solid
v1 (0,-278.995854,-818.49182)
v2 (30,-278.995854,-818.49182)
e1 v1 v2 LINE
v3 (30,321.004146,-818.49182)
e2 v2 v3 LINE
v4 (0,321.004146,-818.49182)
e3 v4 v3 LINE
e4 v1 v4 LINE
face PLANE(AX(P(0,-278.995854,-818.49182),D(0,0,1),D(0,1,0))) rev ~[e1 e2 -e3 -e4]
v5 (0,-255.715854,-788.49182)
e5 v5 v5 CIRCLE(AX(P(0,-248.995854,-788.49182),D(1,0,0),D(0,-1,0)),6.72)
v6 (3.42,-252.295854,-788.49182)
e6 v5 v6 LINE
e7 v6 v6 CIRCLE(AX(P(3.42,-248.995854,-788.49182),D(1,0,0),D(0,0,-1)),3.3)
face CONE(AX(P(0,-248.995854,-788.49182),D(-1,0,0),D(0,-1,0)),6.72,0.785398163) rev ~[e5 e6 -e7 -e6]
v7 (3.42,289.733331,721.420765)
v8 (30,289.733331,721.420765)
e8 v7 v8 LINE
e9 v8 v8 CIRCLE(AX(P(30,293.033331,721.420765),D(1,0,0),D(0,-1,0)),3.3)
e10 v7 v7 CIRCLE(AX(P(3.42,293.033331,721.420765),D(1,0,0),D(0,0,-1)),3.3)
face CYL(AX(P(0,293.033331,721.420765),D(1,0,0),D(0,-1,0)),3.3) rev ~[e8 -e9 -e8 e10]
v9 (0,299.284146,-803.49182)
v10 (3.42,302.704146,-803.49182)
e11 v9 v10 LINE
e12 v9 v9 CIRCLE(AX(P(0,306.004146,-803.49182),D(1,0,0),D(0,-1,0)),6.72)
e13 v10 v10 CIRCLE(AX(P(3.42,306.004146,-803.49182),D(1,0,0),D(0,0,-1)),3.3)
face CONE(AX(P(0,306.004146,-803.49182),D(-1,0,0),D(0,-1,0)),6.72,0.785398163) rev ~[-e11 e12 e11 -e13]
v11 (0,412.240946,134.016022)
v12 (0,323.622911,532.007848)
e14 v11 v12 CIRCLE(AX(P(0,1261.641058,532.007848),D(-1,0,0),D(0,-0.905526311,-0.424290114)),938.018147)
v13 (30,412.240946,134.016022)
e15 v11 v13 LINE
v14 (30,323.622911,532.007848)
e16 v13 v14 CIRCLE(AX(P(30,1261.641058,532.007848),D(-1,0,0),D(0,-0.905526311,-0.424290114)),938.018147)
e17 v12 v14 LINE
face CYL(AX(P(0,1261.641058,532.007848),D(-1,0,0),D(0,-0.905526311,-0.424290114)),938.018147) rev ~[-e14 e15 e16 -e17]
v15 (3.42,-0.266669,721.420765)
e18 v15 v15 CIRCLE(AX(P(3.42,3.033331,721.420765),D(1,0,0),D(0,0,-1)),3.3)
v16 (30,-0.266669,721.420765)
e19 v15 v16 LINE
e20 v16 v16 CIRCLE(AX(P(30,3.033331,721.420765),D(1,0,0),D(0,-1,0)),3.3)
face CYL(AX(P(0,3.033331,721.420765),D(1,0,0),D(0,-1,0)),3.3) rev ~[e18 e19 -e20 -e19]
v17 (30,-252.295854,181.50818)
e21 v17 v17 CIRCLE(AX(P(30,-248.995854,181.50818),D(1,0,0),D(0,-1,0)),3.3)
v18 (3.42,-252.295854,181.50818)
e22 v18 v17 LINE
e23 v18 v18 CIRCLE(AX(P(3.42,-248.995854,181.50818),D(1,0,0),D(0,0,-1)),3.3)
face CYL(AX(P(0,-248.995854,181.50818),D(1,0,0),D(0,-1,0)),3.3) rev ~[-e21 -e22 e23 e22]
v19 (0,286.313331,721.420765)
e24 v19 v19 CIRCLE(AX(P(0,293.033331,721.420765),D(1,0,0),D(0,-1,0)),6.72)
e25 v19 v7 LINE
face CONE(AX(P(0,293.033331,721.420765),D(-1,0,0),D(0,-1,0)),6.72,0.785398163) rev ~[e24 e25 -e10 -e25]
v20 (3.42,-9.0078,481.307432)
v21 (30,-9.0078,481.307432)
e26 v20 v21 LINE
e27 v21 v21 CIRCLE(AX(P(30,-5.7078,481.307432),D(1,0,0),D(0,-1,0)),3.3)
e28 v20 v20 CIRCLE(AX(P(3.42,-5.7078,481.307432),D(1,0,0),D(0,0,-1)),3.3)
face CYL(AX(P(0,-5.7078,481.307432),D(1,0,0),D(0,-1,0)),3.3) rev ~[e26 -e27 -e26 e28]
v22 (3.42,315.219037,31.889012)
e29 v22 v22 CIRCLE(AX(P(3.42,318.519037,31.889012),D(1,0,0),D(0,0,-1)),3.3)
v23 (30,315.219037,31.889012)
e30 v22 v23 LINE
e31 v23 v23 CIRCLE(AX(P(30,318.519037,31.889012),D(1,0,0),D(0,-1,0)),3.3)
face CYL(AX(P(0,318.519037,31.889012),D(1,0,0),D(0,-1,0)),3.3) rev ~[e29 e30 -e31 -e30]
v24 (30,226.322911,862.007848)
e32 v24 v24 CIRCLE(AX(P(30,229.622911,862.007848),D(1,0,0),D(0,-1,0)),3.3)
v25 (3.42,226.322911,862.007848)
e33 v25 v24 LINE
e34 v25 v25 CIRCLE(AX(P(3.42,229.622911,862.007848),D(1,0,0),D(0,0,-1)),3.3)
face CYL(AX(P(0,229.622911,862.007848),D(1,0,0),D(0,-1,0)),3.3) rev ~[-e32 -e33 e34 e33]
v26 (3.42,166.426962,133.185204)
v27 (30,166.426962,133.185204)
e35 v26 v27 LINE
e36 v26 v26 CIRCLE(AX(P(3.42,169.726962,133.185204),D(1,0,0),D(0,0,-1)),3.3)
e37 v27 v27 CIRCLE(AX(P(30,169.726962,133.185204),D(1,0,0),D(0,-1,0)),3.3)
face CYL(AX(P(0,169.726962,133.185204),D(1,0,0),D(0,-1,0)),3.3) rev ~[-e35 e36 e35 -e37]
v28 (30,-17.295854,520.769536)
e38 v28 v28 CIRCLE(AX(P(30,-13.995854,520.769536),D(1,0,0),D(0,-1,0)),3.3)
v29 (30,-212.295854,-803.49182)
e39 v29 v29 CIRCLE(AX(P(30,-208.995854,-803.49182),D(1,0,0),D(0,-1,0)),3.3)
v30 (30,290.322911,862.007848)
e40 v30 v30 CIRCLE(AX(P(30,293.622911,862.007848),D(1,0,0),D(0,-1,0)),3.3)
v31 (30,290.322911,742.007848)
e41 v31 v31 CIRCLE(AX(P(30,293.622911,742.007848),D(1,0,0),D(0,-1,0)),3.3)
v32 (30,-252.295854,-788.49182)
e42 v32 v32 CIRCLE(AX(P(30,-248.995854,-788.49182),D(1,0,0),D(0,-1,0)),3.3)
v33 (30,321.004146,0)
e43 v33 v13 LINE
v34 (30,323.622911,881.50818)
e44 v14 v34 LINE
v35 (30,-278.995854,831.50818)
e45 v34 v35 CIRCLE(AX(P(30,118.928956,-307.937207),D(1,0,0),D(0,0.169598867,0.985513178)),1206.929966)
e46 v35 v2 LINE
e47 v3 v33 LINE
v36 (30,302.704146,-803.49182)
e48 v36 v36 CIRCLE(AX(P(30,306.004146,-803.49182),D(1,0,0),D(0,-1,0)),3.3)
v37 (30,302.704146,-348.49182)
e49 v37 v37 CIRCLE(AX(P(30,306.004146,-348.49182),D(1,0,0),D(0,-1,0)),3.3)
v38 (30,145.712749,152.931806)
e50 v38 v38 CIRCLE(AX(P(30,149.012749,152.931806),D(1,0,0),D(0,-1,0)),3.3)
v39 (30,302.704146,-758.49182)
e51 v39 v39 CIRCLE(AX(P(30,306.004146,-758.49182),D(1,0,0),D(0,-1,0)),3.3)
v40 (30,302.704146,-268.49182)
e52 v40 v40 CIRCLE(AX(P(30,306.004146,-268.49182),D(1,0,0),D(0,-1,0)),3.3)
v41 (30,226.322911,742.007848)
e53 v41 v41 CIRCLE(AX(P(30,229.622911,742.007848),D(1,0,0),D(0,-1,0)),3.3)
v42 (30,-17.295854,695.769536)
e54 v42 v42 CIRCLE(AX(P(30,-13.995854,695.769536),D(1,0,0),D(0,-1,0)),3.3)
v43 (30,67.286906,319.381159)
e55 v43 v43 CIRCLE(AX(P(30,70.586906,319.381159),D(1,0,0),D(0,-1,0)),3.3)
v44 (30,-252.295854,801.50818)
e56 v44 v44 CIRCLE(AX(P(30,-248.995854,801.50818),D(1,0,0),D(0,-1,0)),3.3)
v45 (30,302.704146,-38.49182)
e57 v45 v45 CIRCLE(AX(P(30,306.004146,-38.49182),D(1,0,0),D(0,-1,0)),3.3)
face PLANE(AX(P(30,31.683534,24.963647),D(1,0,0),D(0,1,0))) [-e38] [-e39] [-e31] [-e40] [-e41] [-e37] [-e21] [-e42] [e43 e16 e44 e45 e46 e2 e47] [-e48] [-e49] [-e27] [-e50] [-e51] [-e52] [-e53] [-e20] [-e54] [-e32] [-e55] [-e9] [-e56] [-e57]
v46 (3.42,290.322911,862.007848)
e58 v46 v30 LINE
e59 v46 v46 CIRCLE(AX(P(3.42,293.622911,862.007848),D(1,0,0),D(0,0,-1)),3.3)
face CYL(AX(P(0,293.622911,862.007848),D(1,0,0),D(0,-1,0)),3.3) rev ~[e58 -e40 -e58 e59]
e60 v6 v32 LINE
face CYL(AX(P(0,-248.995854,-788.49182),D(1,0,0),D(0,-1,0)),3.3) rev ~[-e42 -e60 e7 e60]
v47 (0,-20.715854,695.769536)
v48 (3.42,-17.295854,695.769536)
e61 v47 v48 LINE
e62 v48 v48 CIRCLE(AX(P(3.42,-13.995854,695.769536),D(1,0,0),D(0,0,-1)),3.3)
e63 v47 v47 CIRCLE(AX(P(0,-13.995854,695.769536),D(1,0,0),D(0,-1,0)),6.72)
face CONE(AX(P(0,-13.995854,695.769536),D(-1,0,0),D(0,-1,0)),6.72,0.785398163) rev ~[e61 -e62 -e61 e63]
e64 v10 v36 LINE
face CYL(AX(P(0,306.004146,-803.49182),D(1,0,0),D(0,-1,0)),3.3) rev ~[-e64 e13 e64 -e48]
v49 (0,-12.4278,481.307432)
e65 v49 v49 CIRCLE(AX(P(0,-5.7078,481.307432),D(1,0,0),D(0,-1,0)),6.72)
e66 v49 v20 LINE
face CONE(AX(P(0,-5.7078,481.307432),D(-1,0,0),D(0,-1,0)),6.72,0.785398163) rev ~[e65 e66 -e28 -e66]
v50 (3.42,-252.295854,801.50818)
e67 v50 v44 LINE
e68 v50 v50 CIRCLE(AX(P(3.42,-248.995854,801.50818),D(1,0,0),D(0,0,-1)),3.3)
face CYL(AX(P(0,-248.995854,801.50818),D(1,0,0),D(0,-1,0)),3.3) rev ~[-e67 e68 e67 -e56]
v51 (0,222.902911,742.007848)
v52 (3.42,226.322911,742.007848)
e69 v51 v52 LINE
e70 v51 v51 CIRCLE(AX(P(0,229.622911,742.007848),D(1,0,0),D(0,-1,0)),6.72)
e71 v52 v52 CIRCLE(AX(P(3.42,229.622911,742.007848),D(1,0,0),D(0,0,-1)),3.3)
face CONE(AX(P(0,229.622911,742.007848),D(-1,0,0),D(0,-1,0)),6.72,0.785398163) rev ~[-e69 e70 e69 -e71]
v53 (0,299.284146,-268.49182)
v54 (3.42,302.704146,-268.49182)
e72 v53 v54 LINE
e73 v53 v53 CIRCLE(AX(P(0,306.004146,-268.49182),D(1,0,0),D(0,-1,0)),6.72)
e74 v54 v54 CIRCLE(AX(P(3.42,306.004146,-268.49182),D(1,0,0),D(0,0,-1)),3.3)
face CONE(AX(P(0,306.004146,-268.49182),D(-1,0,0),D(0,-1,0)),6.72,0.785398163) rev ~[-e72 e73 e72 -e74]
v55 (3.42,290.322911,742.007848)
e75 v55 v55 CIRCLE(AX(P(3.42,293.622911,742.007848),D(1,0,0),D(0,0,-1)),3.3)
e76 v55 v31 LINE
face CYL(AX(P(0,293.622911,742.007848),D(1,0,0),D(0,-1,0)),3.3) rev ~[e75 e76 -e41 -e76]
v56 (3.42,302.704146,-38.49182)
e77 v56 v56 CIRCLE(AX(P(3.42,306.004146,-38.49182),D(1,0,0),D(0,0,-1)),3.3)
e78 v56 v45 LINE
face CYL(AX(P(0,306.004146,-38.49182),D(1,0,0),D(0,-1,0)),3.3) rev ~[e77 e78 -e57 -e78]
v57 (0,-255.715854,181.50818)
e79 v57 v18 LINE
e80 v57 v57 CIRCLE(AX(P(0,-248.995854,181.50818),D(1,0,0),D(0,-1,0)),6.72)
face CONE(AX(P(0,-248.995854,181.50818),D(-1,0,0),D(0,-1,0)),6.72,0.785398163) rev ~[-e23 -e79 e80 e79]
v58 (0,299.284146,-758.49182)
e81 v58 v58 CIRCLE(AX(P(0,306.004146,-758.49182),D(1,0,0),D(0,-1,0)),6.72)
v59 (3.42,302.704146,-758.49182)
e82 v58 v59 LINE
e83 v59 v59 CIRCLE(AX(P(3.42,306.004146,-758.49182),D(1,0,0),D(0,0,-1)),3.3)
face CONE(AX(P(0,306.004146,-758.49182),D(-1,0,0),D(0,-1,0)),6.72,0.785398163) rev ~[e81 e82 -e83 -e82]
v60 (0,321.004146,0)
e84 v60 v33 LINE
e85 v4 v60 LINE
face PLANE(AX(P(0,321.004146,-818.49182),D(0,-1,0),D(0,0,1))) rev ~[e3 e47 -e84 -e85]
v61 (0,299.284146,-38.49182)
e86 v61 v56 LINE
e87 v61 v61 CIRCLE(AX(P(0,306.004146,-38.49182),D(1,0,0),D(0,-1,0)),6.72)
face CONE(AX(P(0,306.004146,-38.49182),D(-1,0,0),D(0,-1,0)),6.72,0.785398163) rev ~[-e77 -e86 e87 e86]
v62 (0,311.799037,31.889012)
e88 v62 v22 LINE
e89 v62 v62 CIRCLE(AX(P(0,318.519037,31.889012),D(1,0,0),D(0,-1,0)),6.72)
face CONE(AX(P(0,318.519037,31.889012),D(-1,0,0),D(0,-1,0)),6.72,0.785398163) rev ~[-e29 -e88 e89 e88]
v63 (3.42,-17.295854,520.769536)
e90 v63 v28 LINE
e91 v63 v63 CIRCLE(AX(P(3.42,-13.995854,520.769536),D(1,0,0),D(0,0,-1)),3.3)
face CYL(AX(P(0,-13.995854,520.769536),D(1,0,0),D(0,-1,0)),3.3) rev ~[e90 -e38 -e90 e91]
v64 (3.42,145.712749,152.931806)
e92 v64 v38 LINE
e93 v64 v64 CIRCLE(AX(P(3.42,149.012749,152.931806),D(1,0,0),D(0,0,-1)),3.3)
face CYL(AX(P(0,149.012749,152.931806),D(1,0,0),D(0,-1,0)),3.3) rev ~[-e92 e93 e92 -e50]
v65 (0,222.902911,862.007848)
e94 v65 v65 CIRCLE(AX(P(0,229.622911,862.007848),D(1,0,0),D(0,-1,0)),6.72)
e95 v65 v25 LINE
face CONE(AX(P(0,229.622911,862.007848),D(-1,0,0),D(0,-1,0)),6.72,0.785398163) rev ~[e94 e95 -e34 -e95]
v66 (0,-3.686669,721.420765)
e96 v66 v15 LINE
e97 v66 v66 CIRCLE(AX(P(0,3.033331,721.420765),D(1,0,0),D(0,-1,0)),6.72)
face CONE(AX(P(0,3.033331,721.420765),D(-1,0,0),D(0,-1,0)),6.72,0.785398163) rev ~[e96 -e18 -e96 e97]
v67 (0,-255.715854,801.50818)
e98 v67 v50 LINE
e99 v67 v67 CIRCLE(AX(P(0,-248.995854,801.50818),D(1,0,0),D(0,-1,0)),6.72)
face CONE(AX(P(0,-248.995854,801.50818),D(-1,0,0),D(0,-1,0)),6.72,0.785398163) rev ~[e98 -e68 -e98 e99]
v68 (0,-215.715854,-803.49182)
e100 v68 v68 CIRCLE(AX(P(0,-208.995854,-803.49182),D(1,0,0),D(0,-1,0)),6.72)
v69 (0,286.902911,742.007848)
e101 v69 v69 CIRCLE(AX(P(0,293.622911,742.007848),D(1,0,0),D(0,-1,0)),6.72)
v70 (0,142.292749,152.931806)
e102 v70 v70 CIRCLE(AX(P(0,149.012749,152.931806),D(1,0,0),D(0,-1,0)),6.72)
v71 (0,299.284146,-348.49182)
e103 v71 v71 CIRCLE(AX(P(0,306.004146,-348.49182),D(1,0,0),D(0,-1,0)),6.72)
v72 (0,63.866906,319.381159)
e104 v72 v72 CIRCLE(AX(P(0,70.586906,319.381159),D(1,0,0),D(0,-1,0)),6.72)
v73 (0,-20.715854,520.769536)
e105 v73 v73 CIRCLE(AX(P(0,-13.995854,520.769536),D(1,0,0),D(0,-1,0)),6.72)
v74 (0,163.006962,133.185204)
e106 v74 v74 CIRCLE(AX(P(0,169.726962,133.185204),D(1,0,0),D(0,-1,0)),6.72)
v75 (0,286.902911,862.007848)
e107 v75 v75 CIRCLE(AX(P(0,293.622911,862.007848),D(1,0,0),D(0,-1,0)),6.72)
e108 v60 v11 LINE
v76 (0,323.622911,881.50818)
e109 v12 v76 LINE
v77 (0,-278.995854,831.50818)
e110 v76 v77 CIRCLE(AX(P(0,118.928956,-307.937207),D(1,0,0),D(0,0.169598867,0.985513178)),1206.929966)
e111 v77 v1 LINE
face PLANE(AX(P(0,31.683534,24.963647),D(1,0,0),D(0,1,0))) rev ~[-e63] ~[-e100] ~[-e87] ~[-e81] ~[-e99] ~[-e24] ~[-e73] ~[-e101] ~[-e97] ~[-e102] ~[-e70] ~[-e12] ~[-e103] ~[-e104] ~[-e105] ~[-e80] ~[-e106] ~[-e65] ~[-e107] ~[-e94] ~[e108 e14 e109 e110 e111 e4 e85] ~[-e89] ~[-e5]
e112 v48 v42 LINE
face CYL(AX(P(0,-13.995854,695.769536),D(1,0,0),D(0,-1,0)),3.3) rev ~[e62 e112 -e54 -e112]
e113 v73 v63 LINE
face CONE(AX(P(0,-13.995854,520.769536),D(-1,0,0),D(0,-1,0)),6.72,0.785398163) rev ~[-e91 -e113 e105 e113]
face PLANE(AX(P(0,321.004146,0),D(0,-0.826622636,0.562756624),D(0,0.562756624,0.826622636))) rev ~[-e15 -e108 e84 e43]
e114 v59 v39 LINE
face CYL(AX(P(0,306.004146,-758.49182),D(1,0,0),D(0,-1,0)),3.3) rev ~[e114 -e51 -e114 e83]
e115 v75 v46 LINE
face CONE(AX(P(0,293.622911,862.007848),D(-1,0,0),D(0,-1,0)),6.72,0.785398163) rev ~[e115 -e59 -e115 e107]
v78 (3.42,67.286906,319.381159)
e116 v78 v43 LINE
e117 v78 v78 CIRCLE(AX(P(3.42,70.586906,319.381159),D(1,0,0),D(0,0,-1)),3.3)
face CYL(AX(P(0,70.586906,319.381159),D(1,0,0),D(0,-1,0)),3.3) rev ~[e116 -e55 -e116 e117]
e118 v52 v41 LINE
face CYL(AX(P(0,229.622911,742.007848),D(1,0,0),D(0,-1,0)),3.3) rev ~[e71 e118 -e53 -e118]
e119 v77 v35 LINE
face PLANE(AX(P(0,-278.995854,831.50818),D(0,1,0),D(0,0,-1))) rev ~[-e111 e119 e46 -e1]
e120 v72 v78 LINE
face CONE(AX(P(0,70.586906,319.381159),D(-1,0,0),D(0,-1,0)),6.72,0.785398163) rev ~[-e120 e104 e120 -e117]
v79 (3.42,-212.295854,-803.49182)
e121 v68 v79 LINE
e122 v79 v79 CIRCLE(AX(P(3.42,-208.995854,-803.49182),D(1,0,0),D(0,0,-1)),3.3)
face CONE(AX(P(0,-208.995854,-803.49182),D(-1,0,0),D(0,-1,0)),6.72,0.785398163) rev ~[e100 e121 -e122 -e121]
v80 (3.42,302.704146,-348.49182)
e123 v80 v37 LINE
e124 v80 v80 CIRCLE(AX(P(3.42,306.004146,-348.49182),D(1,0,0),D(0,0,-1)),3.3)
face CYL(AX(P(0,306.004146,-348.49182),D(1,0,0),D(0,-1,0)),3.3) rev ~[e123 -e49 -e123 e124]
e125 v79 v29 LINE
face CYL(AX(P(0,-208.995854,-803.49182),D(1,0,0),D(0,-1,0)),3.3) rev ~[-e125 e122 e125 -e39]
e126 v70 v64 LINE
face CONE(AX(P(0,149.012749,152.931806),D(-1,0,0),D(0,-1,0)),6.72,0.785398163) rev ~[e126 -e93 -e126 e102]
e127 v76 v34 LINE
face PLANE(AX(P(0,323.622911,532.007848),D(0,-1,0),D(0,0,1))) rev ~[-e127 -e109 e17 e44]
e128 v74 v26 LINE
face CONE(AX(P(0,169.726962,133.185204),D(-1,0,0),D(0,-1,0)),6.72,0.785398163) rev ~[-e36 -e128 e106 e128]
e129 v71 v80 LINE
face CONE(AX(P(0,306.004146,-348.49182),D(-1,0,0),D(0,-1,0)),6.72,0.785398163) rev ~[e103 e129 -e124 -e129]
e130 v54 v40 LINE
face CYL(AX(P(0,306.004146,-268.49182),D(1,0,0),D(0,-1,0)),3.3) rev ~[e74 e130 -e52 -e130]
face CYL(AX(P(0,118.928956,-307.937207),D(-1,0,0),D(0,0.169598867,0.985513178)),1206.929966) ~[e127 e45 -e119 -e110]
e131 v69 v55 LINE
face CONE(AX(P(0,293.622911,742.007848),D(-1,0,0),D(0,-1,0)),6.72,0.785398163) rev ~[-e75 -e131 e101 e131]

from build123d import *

# Parameters (mm, degrees)
F1_DEPTH       = 30
F2_D           = 6.6
F2_CSINK_D     = 13.44
F2_CSINK_ANGLE = 90


# Not quite as in the source:
# - a feature names something its author has since deleted; it is built from what else it names


with BuildPart() as f1:
    # F0 (on Right) → F1 (new body)
    with BuildSketch(Plane.YZ):
        with BuildLine():
            Line((-278.9958539005, 831.5081800917), (-278.9958539005, -818.4918199083))
            Line((-278.9958539005, -818.4918199083), (321.0041460995, -818.4918199083))
            Line((321.0041460995, -818.4918199083), (321.0041460995, 0))
            Line((321.0041460995, 0), (412.2409460549, 134.0160220861))
            ThreePointArc((412.2409460549, 134.0160220861), (346.0454150195, 328.1386194333), (323.6229111026, 532.0078482247))
            Line((323.6229111026, 532.0078482247), (323.6229111026, 881.5081800917))
            ThreePointArc((323.6229111026, 881.5081800917), (19.1314569656, 894.8597016737), (-278.9958539005, 831.5081800917))
        make_face()
    extrude(amount=F1_DEPTH)

    # F2 (through all)
    with Locations(Plane(origin=(0, 0, 0), x_dir=(0, 1, 0), z_dir=(-1, 0, 0))):
        with Locations((293.6229111026, -742.0078482247), (293.6229111026, -862.0078482247), (229.6229111026, -862.0078482247), (229.6229111026, -742.0078482247), (-248.9958539005, -801.5081800917), (-248.9958539005, -181.5081800917), (306.0041460995, 38.4918199083), (306.0041460995, 348.4918199083), (306.0041460995, 758.4918199083), (306.0041460995, 803.4918199083), (-208.9958539005, 803.4918199083), (-248.9958539005, 788.4918199083), (306.0041460995, 268.4918199083), (318.5190369661, -31.8890116707), (169.7269624564, -133.1852039145), (149.0127494203, -152.9318064879), (70.5869059911, -319.3811593927), (-5.7078003883, -481.3074320555), (-13.9958539005, -520.7695364952), (-13.9958539005, -695.7695364952), (293.033330664, -721.4207649231), (3.033330664, -721.4207649231)):
            CounterSinkHole(F2_D / 2, F2_CSINK_D / 2, counter_sink_angle=F2_CSINK_ANGLE)


solid = f1.part
